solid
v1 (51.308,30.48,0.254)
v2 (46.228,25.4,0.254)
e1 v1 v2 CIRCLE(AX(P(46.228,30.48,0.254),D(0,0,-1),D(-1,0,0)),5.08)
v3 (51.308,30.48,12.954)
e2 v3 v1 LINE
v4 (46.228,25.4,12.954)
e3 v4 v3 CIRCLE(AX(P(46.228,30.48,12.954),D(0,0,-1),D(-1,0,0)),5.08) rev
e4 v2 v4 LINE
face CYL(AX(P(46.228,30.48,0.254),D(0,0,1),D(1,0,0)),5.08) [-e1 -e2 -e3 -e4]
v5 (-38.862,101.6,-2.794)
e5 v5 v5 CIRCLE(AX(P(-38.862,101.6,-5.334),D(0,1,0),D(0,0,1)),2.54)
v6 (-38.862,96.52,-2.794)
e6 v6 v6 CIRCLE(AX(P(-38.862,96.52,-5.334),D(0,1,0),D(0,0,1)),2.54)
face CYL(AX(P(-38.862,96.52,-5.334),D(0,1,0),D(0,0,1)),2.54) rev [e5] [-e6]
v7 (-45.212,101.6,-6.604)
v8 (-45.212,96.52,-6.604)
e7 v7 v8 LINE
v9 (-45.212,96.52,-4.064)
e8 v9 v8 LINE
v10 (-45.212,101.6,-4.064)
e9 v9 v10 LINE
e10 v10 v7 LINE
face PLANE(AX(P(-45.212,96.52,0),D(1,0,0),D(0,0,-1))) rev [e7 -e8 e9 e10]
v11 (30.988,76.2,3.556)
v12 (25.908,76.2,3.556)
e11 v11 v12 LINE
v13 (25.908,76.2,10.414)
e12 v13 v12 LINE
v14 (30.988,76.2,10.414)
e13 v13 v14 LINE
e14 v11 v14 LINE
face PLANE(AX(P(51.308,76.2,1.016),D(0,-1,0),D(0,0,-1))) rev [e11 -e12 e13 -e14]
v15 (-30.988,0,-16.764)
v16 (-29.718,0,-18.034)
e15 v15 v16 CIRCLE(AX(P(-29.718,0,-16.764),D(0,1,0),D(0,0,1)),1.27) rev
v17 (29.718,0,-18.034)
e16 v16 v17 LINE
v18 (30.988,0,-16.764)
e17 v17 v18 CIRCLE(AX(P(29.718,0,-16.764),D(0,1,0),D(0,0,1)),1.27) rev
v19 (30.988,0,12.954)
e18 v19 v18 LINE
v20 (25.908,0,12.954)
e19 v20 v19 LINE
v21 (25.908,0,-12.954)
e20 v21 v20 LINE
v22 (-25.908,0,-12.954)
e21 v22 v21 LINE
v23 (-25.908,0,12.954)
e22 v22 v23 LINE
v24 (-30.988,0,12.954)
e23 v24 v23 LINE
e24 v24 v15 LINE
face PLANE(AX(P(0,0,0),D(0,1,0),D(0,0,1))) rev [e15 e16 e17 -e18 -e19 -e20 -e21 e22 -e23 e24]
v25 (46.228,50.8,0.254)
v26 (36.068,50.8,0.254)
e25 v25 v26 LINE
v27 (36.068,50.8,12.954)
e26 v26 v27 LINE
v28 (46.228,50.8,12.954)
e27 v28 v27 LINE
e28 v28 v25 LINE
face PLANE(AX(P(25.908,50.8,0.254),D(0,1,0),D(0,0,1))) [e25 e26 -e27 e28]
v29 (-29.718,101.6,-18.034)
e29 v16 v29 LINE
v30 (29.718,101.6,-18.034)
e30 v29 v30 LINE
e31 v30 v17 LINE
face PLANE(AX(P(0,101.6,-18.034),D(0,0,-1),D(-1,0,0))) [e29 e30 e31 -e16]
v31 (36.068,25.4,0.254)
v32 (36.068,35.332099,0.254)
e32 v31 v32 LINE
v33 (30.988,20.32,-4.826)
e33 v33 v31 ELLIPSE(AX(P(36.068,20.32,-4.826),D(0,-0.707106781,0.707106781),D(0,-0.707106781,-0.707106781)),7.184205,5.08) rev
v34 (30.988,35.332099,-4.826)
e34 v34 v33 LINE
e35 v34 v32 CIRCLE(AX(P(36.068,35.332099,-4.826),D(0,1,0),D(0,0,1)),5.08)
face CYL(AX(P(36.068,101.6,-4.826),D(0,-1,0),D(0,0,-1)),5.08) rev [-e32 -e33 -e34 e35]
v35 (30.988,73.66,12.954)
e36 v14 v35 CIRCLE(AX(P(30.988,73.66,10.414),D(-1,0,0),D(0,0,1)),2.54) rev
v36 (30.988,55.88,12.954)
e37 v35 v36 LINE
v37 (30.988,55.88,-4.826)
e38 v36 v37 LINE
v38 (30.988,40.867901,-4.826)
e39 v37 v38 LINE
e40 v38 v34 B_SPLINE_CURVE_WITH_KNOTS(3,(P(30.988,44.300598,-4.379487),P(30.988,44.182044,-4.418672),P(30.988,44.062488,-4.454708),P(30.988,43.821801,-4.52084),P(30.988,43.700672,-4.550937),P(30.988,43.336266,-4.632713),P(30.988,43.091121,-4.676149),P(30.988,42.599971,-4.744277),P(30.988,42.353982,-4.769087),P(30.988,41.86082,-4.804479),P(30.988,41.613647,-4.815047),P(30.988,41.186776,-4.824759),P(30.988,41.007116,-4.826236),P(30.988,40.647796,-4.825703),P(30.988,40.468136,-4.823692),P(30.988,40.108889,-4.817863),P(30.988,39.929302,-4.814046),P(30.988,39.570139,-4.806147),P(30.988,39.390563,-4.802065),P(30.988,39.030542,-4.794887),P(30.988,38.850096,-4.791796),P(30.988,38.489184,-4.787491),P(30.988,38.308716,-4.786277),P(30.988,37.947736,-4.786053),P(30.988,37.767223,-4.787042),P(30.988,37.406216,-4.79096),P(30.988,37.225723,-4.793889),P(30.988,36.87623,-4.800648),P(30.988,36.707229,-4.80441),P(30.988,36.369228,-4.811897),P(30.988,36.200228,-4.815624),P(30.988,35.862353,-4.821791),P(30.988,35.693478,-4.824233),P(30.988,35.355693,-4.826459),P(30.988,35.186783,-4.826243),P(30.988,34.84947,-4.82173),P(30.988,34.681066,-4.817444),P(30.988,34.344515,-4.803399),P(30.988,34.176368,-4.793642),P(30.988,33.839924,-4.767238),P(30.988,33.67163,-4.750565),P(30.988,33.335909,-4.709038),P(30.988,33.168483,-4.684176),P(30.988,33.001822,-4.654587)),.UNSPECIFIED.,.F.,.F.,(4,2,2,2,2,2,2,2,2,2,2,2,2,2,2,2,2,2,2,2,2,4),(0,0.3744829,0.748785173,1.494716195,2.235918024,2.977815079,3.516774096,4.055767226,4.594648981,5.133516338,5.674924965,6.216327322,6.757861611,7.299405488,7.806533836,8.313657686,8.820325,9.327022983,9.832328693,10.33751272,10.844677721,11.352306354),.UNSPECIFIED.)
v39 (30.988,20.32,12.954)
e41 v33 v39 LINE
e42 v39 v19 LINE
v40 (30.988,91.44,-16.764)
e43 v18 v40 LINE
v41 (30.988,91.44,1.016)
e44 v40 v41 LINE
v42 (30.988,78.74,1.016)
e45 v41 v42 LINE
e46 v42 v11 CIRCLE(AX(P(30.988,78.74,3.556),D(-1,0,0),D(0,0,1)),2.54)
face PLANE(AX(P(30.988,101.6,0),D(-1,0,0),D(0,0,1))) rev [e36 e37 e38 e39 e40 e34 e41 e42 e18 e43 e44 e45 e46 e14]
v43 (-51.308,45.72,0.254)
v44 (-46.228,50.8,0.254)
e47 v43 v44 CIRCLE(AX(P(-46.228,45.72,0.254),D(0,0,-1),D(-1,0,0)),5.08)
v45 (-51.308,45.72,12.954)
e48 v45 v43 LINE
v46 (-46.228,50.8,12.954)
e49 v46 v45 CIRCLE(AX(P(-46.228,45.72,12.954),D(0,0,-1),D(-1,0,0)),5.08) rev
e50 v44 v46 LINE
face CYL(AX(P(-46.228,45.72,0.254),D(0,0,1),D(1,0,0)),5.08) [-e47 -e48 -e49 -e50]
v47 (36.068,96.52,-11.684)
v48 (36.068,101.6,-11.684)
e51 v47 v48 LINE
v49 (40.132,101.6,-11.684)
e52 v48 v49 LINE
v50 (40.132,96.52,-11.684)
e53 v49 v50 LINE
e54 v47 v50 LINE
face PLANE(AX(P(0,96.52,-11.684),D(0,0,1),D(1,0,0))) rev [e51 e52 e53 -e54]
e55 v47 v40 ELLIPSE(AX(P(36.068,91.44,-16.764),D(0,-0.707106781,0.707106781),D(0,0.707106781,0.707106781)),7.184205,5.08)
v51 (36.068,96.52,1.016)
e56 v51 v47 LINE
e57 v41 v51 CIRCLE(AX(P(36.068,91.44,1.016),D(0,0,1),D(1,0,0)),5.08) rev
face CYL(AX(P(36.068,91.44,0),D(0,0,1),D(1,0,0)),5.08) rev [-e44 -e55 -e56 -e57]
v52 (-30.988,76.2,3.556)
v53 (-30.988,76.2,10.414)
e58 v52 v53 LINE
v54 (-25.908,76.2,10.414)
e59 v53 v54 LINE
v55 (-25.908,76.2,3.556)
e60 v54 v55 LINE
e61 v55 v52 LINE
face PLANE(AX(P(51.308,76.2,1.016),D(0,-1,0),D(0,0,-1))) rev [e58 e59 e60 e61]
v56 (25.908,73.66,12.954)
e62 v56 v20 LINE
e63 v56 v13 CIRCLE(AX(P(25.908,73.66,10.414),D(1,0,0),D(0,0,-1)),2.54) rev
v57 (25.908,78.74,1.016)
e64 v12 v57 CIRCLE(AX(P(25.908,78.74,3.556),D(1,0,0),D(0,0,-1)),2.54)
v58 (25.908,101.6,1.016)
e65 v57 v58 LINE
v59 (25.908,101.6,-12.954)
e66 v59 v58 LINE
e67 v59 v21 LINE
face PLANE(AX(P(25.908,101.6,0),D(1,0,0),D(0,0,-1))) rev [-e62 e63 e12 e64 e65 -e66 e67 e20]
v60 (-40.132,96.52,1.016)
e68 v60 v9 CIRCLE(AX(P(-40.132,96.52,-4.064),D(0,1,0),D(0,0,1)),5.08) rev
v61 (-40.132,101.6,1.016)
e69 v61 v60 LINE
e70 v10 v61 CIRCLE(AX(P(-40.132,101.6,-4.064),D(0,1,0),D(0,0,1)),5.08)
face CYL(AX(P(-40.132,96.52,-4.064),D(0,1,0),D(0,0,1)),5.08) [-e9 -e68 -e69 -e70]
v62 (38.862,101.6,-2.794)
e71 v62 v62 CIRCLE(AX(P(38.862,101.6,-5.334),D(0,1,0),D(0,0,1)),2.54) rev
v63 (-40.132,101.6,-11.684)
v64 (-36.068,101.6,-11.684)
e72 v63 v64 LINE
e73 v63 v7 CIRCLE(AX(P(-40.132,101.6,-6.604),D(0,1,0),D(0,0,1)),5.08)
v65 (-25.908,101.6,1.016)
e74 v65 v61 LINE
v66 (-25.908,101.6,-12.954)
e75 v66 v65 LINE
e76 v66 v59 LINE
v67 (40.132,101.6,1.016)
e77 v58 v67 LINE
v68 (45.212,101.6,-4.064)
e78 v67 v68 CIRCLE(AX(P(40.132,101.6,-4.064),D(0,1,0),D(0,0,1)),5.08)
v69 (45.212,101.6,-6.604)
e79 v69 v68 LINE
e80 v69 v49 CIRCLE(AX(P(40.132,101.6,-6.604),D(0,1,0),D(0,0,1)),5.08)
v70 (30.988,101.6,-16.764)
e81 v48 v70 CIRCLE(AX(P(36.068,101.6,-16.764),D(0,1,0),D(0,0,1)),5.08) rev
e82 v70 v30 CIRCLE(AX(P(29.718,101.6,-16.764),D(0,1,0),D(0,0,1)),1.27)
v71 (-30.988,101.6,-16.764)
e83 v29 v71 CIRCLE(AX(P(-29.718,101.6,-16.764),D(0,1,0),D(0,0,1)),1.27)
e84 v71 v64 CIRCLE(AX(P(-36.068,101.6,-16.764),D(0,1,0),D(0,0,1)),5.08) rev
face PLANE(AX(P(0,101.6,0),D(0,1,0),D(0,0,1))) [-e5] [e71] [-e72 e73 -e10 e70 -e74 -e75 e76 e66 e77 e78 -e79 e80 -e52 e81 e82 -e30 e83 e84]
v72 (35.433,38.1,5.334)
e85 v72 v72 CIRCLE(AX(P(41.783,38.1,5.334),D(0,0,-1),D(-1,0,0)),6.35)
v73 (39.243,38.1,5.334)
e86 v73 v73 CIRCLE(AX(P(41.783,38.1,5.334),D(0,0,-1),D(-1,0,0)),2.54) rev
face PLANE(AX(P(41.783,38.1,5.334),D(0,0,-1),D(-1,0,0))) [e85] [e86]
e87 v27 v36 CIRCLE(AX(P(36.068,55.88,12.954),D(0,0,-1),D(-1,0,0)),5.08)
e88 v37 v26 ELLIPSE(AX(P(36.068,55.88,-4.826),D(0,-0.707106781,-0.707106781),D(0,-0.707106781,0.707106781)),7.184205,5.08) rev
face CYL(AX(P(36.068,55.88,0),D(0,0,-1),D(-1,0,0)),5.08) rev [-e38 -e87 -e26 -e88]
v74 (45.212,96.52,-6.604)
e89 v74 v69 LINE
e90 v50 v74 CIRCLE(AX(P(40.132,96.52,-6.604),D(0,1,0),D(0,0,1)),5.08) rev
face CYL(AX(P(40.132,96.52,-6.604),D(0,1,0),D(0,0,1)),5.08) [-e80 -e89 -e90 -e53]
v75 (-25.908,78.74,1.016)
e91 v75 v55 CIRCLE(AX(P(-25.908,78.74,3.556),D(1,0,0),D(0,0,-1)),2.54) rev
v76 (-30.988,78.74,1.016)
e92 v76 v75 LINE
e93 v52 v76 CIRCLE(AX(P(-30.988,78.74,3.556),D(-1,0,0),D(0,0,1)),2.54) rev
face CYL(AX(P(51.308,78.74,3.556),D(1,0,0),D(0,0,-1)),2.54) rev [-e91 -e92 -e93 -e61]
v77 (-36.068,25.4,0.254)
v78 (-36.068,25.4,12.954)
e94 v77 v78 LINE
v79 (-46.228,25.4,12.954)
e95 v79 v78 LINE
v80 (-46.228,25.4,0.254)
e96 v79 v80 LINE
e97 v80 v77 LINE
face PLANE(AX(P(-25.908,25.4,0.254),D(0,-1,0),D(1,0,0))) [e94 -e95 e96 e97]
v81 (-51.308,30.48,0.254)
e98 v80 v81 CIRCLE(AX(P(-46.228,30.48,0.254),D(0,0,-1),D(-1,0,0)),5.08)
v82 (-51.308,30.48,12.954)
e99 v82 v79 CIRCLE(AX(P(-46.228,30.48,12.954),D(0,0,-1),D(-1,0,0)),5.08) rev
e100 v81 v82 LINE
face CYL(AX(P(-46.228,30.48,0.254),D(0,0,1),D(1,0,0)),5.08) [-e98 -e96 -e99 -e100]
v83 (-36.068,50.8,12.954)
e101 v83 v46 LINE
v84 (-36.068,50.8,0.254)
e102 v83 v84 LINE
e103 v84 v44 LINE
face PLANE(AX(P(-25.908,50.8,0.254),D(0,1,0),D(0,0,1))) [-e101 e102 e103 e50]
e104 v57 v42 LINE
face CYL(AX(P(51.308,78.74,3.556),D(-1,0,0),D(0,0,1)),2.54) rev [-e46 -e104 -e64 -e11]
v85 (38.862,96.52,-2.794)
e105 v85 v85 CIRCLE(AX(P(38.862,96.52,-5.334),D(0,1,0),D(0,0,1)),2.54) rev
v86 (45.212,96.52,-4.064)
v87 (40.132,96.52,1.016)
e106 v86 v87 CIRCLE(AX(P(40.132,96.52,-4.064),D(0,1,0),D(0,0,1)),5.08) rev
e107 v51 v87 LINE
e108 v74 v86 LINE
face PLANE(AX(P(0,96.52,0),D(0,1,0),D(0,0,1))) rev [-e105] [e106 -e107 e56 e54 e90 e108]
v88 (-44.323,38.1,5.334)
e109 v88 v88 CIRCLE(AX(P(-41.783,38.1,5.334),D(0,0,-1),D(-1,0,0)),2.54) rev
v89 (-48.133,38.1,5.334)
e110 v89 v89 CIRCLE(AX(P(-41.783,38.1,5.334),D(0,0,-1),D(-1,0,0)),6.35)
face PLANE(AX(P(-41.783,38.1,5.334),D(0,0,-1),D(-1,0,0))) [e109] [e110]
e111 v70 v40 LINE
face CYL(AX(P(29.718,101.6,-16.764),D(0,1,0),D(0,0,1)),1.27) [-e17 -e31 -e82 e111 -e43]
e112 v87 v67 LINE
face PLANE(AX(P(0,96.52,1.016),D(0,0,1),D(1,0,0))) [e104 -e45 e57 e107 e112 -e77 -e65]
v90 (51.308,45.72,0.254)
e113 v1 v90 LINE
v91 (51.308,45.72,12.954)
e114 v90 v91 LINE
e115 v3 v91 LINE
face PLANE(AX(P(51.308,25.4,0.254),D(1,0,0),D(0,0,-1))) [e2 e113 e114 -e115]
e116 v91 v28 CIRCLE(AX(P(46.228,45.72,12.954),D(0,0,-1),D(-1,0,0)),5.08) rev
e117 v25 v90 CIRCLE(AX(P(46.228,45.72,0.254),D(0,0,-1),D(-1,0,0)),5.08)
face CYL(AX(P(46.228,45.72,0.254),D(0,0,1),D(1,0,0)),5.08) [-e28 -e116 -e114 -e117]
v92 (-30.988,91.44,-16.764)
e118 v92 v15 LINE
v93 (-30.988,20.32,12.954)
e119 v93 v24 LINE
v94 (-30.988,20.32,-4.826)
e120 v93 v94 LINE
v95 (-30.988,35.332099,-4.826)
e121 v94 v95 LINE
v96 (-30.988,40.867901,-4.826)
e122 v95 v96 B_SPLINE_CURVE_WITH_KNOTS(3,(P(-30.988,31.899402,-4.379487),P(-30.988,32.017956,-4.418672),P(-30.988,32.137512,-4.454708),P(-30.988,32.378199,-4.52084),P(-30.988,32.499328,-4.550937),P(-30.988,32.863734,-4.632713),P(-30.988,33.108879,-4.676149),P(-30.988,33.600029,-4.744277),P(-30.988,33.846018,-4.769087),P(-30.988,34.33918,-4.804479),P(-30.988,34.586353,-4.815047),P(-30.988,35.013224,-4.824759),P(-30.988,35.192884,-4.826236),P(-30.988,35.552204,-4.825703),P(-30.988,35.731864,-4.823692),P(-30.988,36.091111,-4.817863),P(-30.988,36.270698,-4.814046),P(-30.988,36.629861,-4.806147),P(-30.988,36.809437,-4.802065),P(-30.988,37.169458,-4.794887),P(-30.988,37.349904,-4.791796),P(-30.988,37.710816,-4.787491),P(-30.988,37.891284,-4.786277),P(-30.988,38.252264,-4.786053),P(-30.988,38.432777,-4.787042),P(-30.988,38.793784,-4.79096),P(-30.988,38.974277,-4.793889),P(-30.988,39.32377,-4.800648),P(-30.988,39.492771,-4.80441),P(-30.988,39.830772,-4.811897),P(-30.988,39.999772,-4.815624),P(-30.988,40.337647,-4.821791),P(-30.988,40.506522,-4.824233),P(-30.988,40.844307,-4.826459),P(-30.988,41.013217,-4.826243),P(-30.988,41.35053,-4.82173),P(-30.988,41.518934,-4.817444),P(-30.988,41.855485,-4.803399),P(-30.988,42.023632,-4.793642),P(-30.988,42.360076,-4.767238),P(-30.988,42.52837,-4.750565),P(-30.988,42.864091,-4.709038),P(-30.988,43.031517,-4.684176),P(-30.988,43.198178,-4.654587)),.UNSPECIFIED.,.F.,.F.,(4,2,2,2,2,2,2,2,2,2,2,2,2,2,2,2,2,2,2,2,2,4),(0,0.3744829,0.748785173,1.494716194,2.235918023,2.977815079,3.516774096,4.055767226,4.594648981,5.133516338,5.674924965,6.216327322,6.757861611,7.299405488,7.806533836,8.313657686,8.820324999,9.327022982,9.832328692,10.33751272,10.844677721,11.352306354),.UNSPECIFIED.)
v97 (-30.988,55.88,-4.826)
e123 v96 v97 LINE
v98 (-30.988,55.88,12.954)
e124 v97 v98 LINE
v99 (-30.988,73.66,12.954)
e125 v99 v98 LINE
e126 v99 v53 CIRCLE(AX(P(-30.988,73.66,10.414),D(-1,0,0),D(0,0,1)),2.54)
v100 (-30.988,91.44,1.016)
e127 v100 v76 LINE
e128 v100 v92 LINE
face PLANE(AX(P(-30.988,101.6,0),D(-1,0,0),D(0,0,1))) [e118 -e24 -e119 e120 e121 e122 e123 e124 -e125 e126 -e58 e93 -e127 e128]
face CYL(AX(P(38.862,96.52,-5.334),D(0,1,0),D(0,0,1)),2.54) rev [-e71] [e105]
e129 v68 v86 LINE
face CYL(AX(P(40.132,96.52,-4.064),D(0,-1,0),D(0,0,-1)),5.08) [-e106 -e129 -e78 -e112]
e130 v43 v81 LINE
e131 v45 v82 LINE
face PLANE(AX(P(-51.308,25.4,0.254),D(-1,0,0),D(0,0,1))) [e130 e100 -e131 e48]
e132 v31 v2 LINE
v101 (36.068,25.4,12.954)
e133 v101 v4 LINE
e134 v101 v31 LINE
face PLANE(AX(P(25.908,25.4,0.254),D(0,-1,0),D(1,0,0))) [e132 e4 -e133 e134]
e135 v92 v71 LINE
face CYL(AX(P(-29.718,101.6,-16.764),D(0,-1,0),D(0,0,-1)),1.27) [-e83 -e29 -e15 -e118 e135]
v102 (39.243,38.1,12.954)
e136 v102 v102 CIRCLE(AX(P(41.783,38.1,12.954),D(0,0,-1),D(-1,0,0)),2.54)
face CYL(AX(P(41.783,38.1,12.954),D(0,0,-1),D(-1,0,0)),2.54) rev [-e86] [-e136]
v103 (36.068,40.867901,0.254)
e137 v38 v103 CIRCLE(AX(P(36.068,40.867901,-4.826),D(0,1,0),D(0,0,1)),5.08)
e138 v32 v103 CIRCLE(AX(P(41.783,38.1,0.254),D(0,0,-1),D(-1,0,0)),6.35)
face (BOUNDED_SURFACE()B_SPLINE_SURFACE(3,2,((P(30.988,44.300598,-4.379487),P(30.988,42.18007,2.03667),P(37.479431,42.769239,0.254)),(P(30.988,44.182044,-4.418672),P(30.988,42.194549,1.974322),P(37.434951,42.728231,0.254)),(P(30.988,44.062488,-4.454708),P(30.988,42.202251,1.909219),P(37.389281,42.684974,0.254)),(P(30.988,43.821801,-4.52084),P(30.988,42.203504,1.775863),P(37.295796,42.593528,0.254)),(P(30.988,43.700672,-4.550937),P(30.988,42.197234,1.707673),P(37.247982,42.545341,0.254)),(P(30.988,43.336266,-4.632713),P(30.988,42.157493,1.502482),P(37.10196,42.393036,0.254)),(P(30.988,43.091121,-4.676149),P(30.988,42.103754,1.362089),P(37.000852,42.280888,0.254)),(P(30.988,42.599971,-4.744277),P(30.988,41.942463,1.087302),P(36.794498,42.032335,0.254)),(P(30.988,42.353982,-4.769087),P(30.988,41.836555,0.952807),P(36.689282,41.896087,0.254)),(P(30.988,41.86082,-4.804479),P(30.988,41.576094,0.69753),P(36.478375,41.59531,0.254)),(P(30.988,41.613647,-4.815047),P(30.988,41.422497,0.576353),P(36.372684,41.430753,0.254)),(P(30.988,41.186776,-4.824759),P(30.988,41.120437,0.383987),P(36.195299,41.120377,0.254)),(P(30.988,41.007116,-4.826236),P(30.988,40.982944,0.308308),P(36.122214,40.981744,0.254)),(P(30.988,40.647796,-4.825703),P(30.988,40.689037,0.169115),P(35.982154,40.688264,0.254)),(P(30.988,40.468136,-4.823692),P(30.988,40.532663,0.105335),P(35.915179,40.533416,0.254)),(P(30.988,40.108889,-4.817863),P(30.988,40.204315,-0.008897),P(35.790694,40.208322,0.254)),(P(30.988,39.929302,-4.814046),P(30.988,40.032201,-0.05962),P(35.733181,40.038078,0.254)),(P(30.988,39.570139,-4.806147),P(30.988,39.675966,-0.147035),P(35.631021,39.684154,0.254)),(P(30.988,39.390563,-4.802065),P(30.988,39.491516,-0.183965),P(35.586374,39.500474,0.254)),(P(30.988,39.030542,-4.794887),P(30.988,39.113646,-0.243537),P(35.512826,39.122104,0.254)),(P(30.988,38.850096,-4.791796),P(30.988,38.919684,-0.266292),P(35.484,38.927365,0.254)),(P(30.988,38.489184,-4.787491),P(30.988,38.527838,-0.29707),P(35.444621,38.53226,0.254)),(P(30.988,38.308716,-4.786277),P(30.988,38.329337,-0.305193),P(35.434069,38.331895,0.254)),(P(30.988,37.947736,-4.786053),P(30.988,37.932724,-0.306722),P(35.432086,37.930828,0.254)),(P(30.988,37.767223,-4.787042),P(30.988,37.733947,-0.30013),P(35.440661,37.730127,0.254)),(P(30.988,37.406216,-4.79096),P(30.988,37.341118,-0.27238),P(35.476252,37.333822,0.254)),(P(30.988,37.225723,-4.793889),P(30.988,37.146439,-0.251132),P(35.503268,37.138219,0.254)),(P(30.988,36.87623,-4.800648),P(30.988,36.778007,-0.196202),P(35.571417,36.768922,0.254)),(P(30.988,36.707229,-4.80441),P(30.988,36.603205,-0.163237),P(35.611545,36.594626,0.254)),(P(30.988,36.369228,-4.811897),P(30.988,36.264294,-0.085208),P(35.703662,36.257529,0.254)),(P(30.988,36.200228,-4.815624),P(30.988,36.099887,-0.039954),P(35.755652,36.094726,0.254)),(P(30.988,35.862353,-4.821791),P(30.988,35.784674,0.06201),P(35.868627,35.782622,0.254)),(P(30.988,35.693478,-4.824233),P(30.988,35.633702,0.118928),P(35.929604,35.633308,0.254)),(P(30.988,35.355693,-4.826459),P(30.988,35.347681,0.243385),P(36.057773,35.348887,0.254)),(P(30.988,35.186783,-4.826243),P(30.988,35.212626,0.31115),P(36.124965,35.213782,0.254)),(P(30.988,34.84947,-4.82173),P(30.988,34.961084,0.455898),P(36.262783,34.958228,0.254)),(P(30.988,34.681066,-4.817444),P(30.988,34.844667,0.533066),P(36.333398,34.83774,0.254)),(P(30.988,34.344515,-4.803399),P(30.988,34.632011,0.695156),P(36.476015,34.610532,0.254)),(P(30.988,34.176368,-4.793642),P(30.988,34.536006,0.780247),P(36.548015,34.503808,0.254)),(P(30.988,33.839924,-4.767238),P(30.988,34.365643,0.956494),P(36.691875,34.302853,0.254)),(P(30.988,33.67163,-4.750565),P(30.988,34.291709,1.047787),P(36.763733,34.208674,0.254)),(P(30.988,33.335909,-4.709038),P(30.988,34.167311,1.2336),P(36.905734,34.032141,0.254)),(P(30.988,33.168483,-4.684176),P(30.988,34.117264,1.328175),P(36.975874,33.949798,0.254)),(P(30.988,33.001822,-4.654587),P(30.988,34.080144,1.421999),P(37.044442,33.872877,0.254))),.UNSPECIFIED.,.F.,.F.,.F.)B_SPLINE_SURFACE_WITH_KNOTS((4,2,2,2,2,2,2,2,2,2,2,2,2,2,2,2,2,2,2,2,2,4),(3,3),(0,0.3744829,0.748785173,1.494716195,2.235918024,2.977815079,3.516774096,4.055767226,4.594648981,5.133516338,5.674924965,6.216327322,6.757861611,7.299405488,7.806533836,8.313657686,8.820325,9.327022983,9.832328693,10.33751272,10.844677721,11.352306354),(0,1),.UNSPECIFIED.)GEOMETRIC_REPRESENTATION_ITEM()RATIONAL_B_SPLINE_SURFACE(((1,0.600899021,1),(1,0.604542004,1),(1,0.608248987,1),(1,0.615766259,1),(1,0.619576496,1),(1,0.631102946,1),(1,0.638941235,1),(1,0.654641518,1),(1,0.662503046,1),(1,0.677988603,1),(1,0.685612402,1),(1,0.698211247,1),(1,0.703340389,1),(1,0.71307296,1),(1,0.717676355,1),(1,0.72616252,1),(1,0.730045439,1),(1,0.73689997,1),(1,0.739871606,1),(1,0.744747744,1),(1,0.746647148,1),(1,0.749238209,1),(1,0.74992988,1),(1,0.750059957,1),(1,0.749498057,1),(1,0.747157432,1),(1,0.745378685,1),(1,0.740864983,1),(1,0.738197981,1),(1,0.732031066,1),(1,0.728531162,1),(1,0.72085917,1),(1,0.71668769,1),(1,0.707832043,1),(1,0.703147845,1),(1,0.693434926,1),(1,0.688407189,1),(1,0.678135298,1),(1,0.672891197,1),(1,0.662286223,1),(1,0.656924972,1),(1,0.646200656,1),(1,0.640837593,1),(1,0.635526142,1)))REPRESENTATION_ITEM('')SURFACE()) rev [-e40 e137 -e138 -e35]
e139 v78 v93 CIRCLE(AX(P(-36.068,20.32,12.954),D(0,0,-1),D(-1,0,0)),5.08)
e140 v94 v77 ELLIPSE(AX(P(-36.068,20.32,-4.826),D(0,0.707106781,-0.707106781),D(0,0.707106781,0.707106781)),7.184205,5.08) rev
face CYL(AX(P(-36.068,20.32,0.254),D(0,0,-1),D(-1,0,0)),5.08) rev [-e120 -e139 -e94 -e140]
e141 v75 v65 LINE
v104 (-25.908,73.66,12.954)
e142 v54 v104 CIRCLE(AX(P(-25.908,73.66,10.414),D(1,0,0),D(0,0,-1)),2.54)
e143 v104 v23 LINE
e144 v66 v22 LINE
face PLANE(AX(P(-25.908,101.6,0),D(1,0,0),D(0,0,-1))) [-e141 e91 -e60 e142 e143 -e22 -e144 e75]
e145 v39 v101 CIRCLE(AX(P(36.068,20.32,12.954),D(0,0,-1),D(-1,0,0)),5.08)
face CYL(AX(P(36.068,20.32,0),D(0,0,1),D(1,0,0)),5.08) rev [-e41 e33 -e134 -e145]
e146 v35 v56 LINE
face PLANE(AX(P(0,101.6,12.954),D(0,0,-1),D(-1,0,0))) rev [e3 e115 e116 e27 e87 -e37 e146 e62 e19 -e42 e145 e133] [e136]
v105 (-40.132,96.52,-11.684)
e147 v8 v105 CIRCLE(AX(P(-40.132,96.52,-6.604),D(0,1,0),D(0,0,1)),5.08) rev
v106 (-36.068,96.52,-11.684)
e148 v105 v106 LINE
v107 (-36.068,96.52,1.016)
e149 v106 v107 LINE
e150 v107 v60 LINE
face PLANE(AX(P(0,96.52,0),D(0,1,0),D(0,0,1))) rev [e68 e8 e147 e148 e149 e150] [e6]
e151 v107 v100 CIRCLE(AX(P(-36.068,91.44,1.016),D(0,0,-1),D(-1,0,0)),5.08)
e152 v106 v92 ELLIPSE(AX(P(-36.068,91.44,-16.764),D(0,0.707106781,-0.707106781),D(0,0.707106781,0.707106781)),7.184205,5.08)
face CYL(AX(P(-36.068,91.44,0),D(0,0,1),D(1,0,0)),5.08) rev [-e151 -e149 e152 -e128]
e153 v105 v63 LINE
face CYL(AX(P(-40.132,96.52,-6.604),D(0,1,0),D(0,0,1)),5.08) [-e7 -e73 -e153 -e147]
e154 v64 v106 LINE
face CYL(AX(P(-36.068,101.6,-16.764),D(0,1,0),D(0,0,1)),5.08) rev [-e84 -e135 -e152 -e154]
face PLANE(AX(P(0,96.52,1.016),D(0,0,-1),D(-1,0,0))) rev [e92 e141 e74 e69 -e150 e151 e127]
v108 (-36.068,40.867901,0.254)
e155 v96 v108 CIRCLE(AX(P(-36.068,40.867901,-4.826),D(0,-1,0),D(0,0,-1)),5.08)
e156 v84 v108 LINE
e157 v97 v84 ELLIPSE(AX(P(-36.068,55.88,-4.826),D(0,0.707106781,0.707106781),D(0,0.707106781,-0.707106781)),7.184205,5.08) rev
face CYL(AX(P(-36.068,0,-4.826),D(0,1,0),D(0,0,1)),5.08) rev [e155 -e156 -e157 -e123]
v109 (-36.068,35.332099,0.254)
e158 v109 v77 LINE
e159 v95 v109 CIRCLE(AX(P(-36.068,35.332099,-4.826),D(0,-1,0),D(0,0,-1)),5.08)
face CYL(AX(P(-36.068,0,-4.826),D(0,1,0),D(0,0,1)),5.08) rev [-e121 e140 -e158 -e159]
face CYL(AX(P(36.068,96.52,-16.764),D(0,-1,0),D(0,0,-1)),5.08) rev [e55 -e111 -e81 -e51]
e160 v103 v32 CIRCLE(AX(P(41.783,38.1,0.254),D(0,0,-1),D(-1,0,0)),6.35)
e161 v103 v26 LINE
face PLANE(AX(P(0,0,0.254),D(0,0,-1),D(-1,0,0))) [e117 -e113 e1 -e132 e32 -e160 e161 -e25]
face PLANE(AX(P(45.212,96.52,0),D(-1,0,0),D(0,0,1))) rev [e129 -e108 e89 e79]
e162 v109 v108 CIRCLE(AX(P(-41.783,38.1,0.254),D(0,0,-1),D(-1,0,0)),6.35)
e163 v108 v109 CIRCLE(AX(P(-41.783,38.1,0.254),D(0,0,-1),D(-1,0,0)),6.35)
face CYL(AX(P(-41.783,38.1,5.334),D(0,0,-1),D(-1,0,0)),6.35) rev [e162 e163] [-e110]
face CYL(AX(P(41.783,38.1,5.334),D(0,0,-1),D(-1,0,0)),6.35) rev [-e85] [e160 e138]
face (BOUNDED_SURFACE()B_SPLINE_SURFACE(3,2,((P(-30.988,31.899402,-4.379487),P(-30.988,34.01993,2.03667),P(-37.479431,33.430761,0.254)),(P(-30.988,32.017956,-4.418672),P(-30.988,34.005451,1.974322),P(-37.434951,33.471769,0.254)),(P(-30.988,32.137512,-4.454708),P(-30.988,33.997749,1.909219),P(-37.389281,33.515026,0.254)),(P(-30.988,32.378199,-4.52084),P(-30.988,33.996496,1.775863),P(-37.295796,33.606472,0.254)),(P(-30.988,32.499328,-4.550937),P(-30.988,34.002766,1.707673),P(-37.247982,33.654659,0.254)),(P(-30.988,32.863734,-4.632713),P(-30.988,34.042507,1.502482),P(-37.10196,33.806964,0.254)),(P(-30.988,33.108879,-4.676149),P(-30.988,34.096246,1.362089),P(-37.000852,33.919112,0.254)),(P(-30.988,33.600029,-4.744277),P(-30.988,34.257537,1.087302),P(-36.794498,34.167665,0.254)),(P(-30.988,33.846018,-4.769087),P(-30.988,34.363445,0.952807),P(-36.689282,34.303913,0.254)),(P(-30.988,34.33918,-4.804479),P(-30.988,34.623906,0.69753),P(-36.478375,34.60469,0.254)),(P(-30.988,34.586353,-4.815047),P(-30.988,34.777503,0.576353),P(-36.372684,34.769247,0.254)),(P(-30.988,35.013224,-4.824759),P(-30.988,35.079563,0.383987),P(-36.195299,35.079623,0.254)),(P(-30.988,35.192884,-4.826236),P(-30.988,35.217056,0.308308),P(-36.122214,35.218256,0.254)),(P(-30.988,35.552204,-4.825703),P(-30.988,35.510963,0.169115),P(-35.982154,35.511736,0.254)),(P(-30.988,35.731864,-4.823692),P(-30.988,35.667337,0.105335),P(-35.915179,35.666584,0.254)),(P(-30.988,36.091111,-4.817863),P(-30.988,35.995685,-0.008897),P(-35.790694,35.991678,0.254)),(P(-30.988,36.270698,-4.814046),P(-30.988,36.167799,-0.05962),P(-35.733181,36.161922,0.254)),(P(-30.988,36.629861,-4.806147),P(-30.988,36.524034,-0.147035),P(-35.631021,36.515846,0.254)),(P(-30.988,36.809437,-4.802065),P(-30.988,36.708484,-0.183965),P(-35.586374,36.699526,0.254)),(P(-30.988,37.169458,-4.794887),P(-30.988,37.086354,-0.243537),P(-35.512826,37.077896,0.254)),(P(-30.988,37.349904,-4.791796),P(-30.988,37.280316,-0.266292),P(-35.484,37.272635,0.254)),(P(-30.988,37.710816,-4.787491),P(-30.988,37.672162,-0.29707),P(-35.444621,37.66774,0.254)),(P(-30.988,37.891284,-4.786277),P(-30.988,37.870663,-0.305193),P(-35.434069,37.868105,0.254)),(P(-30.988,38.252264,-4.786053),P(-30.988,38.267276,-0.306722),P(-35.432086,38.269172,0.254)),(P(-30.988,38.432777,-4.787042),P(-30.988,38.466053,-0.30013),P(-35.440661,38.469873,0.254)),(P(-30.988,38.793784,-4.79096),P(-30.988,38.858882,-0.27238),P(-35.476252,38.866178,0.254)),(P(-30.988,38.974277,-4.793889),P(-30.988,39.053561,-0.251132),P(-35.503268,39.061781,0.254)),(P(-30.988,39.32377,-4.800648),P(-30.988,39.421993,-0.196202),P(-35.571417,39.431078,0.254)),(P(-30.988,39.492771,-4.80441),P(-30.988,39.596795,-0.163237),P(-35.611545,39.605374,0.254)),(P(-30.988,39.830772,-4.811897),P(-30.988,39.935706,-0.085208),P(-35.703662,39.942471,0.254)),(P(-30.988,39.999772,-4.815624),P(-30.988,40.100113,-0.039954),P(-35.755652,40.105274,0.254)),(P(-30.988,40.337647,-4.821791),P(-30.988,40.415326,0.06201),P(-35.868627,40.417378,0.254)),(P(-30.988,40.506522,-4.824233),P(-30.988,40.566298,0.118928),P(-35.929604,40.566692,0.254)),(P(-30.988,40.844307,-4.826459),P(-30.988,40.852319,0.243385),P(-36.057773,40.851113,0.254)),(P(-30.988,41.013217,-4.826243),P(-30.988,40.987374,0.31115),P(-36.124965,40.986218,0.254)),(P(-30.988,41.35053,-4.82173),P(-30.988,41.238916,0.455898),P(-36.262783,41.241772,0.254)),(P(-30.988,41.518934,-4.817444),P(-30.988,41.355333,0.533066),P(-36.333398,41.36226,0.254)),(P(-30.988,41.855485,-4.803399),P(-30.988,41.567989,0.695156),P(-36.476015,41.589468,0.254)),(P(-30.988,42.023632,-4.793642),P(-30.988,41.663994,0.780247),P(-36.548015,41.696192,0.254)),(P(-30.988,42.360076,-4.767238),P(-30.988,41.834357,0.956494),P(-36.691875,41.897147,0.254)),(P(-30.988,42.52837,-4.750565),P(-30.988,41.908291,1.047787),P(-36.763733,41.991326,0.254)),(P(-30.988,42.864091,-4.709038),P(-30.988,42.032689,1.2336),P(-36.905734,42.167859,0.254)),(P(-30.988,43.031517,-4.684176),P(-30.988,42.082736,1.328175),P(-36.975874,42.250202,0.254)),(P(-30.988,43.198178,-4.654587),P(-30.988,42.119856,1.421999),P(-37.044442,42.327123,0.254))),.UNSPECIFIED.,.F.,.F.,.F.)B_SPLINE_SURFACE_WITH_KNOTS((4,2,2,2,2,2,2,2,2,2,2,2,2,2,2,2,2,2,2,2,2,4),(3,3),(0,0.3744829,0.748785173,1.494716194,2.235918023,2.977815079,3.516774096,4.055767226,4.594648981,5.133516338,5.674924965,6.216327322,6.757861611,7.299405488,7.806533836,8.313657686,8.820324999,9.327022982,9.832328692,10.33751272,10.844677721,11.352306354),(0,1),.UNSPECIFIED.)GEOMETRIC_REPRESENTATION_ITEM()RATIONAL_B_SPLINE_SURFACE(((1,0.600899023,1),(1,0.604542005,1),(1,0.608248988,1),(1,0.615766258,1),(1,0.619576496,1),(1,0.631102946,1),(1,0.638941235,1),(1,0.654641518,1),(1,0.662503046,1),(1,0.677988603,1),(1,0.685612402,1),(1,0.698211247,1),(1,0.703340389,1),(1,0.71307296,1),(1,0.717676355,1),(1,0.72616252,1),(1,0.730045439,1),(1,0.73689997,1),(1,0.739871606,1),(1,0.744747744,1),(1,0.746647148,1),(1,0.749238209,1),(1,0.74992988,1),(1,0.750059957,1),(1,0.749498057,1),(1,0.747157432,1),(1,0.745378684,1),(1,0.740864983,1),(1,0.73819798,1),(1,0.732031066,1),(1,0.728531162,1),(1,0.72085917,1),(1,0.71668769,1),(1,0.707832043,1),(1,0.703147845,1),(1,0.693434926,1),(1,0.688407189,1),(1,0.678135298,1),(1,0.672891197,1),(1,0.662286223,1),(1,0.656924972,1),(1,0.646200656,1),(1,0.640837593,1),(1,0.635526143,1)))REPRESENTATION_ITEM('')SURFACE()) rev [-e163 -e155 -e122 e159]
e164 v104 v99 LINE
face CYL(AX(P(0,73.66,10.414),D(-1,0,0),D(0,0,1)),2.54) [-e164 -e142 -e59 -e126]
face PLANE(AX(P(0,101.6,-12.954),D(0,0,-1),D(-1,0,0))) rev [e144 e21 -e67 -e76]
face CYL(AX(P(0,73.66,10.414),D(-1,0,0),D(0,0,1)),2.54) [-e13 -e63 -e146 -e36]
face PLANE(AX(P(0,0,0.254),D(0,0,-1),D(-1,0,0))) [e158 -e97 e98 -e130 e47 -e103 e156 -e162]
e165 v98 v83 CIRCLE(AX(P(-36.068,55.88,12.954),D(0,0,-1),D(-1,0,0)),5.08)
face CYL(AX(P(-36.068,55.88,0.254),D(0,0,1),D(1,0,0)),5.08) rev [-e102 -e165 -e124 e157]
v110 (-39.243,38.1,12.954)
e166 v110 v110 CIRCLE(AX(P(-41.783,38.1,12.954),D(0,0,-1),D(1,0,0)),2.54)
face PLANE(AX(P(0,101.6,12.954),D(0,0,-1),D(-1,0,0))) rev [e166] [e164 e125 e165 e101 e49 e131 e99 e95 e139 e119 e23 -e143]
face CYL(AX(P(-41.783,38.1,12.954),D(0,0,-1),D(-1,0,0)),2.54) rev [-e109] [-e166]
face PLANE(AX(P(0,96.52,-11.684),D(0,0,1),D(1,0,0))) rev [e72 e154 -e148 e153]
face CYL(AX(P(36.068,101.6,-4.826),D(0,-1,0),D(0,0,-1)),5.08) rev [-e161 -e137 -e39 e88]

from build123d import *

# Parameters (mm, degrees)
BOSS_EXTRUDE1_DEPTH = 101.6
SKETCH2_W           = 25.4
SKETCH2_H           = 25.4
BOSS_EXTRUDE2_DEPTH = 12.7
SKETCH3_R           = 2.54
CUT_EXTRUDE1_DEPTH  = 116.280188272
SKETCH4_R           = 6.35
CUT_EXTRUDE2_DEPTH  = 5.08
FILLET1_R           = 5.08
SKETCH5_W           = 14.224
SKETCH5_H           = 12.7
SKETCH5_R           = 2.54
BOSS_EXTRUDE3_DEPTH = 5.08
FILLET2_R           = 5.08
FILLET3_R           = 5.08
SKETCH6_W           = 11.938
SKETCH6_H           = 25.4
CUT_EXTRUDE3_DEPTH  = 132.986426559
FILLET4_R           = 2.54
FILLET5_R           = 1.27


with BuildPart() as part:
    # Sketch1 → Boss-Extrude1 (new body)
    with BuildSketch(Plane(origin=(0, 0, 0), x_dir=(1, 0, 0), z_dir=(0, 1, 0))):
        Polygon((-25.908, -12.954), (-25.908, 12.954), (25.908, 12.954), (25.908, -12.954), (30.988, -12.954), (30.988, 18.034), (-30.988, 18.034), (-30.988, -12.954), align=None)
    extrude(amount=BOSS_EXTRUDE1_DEPTH)

    # Sketch2 → Boss-Extrude2 (add)
    with BuildSketch(Plane.XY.offset(12.954)):
        with Locations((38.608, 38.1)):
            Rectangle(SKETCH2_W, SKETCH2_H)
        with Locations((-38.608, 38.1)):
            Rectangle(SKETCH2_W, SKETCH2_H)
    extrude(amount=-BOSS_EXTRUDE2_DEPTH)

    # Sketch3 → Cut-Extrude1 (cut, through all)
    with BuildSketch(Plane(origin=(0, 0, 0.254), x_dir=(-1, 0, 0), z_dir=(0, 0, -1))):
        with Locations((-41.783, 38.1)):
            Circle(SKETCH3_R)
        with Locations(Location((41.783, 38.1, 0), (0, 0, 180))):
            Circle(SKETCH3_R)
    extrude(amount=-CUT_EXTRUDE1_DEPTH, mode=Mode.SUBTRACT)

    # Sketch4 → Cut-Extrude2 (cut)
    with BuildSketch(Plane(origin=(0, 0, 0.254), x_dir=(-1, 0, 0), z_dir=(0, 0, -1))):
        with Locations((-41.783, 38.1)):
            Circle(SKETCH4_R)
        with Locations((41.783, 38.1)):
            Circle(SKETCH4_R)
    extrude(amount=-CUT_EXTRUDE2_DEPTH, mode=Mode.SUBTRACT)

    # Fillet1
    fillet1_edges = [part.edges().sort_by_distance(p)[0] for p in [
        (51.308, 25.4, 6.604),
        (30.988, 50.8, 6.604),
        (51.308, 50.8, 6.604),
        (30.988, 25.4, 6.604),
        (30.988, 38.1, 0.254),
        (-30.988, 25.4, 6.604),
        (-51.308, 25.4, 6.604),
        (-30.988, 50.8, 6.604),
        (-51.308, 50.8, 6.604),
        (-30.988, 38.1, 0.254),
    ]]
    fillet(fillet1_edges, radius=FILLET1_R)

    # Sketch5 → Boss-Extrude3 (add)
    # profile 1 of 2: a face of its own
    with BuildSketch(Plane(origin=(0, 101.6, 0), x_dir=(1, 0, 0), z_dir=(0, 1, 0))):
        with Locations((38.1, 5.334)):
            Rectangle(SKETCH5_W, SKETCH5_H)
        with Locations(Location((38.862, 5.334, 0), (0, 0, 270))):
            Circle(SKETCH5_R, mode=Mode.SUBTRACT)
    # profile 2 of 2: a face of its own
    with BuildSketch(Plane(origin=(0, 101.6, 0), x_dir=(1, 0, 0), z_dir=(0, 1, 0))):
        with Locations((-38.1, 5.334)):
            Rectangle(SKETCH5_W, SKETCH5_H)
        with Locations(Location((-38.862, 5.334, 0), (0, 0, 270))):
            Circle(SKETCH5_R, mode=Mode.SUBTRACT)
    extrude(amount=-BOSS_EXTRUDE3_DEPTH)

    # Fillet2
    fillet2_edges = [part.edges().sort_by_distance(p)[0] for p in [
        (-30.988, 99.06, -11.684),
        (-30.988, 96.52, -5.334),
        (30.988, 99.06, -11.684),
        (30.988, 96.52, -5.334),
    ]]
    fillet(fillet2_edges, radius=FILLET2_R)

    # Fillet3
    fillet3_edges = [part.edges().sort_by_distance(p)[0] for p in [
        (-45.212, 99.06, -11.684),
        (-45.212, 99.06, 1.016),
        (45.212, 99.06, -11.684),
        (45.212, 99.06, 1.016),
    ]]
    fillet(fillet3_edges, radius=FILLET3_R)

    # Sketch6 → Cut-Extrude3 (cut, through all)
    with BuildSketch(Plane.ZY.offset(30.988)):
        with Locations((6.985, 88.9)):
            Rectangle(SKETCH6_W, SKETCH6_H)
    extrude(amount=-CUT_EXTRUDE3_DEPTH, mode=Mode.SUBTRACT)

    # Fillet4
    fillet4_edges = [part.edges().sort_by_distance(p)[0] for p in [
        (28.448, 76.2, 12.954),
        (28.448, 76.2, 1.016),
        (-28.448, 76.2, 1.016),
        (-28.448, 76.2, 12.954),
    ]]
    fillet(fillet4_edges, radius=FILLET4_R)

    # Fillet5
    fillet5_edges = [part.edges().sort_by_distance(p)[0] for p in [
        (30.988, 50.8, -18.034),
        (-30.988, 50.8, -18.034),
    ]]
    fillet(fillet5_edges, radius=FILLET5_R - 0.0001)  # a hair under: the kernel refuses the full size


solid = part.part
